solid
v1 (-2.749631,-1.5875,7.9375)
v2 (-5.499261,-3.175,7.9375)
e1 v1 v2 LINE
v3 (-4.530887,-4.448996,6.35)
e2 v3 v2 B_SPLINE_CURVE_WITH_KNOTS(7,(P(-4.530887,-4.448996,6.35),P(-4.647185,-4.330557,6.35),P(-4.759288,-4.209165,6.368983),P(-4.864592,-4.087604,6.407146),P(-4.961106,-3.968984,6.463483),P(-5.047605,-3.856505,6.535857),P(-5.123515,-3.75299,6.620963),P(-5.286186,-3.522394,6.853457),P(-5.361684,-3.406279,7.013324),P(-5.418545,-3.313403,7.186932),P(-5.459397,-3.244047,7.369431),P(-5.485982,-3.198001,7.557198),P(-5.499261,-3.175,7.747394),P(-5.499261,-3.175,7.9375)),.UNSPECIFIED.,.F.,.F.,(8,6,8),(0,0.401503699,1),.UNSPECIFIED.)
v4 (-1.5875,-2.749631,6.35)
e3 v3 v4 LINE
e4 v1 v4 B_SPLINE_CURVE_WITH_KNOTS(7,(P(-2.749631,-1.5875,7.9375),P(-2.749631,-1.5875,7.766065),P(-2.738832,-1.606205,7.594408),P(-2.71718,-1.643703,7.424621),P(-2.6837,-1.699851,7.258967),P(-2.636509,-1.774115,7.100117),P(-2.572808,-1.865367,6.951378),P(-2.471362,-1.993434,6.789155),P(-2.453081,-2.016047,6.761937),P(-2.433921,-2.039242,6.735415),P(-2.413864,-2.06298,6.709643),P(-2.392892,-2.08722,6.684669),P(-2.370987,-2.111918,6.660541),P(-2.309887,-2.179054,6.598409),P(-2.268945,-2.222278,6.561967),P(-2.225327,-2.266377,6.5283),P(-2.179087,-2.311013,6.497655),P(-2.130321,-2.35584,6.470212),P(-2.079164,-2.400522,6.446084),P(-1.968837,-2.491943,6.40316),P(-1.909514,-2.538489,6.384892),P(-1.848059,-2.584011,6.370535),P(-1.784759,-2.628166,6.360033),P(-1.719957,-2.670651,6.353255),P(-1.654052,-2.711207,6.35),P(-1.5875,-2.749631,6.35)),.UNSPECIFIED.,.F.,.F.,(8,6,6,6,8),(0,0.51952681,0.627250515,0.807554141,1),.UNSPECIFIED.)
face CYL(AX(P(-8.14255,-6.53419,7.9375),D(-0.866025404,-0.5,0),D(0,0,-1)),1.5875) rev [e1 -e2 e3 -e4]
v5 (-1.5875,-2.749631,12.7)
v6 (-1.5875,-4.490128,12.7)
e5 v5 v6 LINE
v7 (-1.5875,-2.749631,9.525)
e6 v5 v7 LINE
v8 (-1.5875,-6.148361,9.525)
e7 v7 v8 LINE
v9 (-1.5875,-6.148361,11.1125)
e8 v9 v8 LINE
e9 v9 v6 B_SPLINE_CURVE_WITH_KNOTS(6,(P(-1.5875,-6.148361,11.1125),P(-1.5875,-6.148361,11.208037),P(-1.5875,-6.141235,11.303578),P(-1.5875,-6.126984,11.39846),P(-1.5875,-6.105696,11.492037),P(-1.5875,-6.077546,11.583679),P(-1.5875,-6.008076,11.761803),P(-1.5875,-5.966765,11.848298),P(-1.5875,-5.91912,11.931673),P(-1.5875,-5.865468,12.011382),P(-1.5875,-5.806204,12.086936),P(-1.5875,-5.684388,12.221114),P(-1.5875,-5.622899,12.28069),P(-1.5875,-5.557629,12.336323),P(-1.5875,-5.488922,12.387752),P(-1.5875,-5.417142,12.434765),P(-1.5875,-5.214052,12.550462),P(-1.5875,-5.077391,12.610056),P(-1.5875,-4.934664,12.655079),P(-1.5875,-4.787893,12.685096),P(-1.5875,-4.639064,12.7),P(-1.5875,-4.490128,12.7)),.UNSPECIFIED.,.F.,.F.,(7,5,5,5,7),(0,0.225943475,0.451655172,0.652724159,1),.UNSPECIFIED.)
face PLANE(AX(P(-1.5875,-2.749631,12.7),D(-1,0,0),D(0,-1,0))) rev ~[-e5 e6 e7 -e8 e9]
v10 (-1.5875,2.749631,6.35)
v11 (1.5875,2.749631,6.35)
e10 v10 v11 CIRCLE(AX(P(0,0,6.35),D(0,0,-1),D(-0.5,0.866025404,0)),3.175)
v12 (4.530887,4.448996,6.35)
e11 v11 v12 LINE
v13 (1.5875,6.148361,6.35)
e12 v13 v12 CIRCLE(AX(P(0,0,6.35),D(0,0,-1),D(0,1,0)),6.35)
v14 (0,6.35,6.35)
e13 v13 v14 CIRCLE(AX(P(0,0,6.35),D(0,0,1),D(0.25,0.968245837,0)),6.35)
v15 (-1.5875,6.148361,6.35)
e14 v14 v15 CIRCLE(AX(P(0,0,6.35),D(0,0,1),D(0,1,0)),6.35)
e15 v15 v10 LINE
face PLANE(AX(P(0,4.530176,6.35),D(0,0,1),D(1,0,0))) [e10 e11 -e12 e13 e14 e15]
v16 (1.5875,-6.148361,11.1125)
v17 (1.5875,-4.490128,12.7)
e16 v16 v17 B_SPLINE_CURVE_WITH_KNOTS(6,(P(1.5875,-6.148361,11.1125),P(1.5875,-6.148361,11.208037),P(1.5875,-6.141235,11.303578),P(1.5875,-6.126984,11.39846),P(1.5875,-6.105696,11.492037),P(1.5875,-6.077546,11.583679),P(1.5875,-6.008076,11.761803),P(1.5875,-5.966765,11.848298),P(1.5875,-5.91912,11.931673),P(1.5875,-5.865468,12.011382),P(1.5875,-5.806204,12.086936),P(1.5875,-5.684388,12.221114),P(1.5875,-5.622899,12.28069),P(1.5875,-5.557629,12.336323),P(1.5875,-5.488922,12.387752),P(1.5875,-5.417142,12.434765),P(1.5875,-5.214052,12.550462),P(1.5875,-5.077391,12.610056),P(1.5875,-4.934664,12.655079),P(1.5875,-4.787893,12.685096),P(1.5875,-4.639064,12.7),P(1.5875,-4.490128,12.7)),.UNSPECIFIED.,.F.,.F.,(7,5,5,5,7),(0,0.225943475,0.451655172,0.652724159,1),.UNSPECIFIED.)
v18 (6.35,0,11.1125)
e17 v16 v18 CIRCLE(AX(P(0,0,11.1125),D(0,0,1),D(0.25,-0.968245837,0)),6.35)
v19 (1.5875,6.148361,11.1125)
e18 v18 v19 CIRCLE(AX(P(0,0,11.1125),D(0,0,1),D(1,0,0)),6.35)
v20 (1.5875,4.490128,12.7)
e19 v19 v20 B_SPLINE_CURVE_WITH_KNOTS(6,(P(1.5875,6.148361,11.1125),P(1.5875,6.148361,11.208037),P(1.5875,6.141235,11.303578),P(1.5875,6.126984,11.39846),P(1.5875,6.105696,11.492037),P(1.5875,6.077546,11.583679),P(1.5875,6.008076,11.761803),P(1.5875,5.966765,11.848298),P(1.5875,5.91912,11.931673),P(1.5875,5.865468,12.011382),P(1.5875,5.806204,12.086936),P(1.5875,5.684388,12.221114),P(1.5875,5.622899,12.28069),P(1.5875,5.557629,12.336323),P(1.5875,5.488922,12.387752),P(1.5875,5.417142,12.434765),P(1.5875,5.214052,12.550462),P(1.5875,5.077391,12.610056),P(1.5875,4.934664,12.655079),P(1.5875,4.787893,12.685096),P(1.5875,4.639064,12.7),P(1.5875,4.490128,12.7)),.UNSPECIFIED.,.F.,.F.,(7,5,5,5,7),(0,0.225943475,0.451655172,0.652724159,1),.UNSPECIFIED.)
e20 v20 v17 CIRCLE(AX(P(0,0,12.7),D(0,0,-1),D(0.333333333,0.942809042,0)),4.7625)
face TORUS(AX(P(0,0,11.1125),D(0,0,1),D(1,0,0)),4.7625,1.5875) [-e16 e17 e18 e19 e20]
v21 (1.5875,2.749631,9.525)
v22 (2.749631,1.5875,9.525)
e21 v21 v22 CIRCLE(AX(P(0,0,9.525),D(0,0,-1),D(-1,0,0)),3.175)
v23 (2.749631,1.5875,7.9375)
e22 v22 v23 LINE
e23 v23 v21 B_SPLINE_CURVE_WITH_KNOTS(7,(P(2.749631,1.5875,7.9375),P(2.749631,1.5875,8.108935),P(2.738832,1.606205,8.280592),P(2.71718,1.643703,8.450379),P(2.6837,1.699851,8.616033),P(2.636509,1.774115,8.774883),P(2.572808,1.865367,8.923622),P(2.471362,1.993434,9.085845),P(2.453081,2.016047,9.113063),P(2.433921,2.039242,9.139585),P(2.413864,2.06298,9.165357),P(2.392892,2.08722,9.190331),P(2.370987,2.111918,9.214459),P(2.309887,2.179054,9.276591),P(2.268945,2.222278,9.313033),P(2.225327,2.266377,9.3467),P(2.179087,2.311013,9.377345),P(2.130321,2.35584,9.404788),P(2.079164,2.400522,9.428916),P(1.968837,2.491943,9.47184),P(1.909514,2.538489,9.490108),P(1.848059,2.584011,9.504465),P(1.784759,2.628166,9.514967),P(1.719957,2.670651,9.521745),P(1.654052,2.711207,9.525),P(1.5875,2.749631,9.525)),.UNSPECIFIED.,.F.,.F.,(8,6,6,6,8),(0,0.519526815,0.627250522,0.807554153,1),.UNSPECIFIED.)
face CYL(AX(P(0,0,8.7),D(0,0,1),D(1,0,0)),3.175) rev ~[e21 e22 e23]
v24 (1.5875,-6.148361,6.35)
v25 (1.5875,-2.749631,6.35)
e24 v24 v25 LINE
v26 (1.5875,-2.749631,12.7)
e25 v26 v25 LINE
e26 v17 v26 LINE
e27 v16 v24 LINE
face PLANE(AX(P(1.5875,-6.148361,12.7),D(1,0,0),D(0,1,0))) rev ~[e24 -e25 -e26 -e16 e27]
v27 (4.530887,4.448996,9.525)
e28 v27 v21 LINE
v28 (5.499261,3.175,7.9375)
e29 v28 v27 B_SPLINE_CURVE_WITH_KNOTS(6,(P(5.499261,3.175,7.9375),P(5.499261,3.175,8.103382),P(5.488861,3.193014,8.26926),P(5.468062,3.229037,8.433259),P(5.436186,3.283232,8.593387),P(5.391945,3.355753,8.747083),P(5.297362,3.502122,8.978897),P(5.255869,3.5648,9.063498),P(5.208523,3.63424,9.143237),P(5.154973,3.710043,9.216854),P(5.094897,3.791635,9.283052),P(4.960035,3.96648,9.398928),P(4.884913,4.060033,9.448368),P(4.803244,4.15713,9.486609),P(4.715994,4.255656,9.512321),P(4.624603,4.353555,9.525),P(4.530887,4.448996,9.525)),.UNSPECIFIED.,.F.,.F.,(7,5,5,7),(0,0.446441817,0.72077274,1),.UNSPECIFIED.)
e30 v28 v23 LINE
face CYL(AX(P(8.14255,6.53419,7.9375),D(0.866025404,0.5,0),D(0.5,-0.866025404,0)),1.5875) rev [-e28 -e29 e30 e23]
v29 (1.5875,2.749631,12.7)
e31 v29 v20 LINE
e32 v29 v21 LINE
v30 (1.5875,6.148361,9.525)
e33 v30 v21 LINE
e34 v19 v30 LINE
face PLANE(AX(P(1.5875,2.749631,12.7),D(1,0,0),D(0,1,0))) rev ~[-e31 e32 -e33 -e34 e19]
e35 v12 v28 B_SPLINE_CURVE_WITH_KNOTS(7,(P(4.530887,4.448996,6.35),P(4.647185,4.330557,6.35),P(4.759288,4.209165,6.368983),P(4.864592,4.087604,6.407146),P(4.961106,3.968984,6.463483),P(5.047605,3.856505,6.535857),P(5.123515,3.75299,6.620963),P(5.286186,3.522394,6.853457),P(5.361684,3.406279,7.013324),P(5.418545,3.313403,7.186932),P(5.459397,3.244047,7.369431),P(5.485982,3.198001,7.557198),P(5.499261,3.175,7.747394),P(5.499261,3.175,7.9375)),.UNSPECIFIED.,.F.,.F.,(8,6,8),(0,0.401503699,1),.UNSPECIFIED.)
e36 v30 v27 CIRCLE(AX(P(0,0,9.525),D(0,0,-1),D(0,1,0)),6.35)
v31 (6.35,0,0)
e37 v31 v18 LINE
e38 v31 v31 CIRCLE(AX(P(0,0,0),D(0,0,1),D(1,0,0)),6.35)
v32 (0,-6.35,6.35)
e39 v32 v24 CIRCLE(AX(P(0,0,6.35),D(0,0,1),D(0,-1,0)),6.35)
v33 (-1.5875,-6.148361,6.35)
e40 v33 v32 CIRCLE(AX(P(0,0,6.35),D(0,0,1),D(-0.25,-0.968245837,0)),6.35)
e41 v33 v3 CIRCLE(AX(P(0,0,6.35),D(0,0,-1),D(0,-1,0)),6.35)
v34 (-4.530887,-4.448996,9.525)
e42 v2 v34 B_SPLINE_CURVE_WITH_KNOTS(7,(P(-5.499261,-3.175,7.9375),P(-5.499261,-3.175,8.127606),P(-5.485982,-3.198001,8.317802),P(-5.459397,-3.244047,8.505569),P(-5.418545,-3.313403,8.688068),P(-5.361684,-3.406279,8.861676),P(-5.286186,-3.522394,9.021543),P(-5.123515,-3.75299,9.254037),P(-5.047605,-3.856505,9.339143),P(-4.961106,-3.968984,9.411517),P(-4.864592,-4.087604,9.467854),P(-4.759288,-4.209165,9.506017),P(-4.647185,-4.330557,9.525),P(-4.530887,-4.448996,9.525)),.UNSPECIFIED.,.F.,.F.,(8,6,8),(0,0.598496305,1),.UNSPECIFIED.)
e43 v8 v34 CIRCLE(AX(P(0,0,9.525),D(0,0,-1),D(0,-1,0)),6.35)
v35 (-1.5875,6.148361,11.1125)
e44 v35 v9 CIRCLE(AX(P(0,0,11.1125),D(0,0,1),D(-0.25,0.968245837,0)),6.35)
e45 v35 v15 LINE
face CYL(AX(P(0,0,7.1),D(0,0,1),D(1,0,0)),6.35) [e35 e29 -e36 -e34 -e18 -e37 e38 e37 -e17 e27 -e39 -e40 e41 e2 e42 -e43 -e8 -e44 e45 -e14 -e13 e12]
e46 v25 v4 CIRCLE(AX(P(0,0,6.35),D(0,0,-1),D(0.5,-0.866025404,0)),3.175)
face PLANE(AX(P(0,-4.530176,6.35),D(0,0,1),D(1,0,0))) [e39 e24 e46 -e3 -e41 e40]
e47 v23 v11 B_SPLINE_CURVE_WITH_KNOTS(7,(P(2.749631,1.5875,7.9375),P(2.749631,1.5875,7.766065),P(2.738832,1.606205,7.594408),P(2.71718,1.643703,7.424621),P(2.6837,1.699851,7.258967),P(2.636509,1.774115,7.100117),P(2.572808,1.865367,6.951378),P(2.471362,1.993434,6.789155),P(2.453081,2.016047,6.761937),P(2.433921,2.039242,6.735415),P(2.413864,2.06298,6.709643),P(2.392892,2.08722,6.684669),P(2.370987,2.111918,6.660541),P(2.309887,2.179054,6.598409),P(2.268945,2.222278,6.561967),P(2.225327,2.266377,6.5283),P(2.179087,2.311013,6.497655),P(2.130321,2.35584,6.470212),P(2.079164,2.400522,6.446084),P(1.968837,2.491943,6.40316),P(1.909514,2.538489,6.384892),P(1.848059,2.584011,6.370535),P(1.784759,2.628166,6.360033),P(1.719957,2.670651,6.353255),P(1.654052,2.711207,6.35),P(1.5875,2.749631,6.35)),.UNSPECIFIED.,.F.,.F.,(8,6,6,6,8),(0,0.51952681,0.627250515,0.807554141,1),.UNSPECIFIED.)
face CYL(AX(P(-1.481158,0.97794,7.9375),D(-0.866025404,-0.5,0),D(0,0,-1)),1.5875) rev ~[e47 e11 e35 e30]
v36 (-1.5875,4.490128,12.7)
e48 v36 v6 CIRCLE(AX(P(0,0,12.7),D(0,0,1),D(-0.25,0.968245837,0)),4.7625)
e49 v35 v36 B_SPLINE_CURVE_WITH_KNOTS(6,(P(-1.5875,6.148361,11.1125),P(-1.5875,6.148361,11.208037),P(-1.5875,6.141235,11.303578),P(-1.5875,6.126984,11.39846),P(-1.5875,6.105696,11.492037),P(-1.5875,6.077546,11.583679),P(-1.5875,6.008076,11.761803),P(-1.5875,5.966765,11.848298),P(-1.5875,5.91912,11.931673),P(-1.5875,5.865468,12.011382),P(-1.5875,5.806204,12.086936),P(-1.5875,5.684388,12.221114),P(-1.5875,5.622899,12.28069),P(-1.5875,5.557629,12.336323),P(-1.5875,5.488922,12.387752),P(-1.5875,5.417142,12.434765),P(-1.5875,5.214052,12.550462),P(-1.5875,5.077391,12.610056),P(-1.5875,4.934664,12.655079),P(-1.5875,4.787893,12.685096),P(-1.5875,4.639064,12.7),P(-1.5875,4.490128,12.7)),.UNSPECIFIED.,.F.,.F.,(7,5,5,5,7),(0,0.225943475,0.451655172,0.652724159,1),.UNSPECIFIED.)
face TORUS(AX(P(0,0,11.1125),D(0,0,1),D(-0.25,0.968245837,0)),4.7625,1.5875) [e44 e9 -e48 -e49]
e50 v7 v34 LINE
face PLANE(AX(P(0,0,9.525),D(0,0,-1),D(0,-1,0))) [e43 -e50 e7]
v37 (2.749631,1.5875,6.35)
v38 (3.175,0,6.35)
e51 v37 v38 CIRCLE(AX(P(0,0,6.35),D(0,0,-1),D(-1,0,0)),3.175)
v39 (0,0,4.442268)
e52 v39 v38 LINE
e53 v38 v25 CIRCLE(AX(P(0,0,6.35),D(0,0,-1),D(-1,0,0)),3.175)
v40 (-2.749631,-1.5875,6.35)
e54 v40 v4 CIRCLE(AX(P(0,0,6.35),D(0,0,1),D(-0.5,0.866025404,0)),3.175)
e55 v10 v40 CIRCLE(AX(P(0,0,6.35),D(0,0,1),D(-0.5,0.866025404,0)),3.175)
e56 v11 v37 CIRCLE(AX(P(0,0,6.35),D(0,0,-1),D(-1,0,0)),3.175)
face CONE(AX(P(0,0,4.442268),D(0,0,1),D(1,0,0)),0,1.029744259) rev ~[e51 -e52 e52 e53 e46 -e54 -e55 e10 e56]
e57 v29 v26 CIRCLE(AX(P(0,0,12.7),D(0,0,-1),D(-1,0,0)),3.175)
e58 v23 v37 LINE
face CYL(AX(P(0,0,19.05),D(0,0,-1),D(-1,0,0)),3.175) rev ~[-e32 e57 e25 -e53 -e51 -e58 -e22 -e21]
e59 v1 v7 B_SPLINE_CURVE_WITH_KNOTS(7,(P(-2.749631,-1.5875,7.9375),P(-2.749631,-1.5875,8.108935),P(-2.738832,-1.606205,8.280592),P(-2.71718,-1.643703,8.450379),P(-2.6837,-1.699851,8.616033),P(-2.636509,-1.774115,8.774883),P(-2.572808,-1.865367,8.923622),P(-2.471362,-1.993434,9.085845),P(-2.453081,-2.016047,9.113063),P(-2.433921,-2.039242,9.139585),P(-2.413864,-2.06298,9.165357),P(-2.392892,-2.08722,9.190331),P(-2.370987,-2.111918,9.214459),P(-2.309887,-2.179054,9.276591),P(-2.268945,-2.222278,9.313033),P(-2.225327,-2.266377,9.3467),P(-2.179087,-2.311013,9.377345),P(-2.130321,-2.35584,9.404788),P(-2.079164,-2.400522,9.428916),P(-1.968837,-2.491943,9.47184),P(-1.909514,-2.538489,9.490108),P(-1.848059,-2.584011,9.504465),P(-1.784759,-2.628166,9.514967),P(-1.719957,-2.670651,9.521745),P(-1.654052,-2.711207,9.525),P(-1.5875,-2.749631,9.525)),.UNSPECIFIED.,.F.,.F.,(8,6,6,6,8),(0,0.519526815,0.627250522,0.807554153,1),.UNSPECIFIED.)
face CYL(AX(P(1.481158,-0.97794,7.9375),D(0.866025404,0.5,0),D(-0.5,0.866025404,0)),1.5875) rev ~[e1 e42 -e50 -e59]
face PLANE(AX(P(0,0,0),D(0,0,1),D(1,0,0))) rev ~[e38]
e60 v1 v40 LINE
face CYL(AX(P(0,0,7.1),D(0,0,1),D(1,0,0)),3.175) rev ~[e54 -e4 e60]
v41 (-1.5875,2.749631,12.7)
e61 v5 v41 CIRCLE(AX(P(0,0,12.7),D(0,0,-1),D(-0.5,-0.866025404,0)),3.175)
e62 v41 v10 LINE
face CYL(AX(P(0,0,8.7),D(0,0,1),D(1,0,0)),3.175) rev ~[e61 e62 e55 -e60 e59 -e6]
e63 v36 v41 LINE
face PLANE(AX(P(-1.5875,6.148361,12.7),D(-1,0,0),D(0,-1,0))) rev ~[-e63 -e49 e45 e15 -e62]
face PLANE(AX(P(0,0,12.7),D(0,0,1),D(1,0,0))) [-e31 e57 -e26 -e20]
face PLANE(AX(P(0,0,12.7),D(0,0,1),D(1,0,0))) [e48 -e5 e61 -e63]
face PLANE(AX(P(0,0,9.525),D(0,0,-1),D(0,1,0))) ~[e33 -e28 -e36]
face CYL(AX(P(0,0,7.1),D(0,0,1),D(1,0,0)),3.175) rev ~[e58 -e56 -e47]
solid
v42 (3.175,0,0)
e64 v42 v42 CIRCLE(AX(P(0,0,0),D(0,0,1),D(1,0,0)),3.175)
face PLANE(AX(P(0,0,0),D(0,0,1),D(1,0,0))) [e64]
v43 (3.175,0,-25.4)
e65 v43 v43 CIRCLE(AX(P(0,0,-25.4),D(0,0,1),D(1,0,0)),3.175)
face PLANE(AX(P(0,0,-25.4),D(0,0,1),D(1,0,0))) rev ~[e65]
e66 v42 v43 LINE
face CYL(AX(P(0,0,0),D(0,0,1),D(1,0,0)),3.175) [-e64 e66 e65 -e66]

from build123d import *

# Parameters (mm, degrees)
F0_R          = 6.35
F1_DEPTH      = 12.7
F2_R          = 3.175
F3_DEPTH      = 25.4
F5_D          = 6.35
F5_DEPTH      = 6.35
F5_TIP        = 1.9077324654
F7_DEPTH      = 6.35
F10_W         = 4.7625
F10_H         = 3.175
F10_W_2       = 4.7752
F11_ANGLE     = 60
F12_T4_DEPTH  = 11.1125
F12_S5_R      = 6.35
F12_T6_DEPTH  = 8
F12_S7_R      = 3.175
F12_T8_DEPTH  = 8
F12_T12_DEPTH = 11.1125
F12_S13_R     = 6.35
F12_T14_DEPTH = 8
F12_S15_R     = 3.175
F12_T16_DEPTH = 8
F12_T20_DEPTH = 11.1125
F12_S21_R     = 6.35
F12_T22_DEPTH = 8
F12_S23_R     = 3.175
F12_T24_DEPTH = 8
F12_T28_DEPTH = 11.1125
F12_S29_R     = 6.35
F12_T30_DEPTH = 8
F12_S31_R     = 3.175
F12_T32_DEPTH = 8
F13_R         = 1.5875


# Not quite as in the source:
# - a fillet or chamfer that OpenCascade refuses, or shapes differently, is made with other operations: its cross-section is extruded or revolved along the edge and cut away or added
# - a feature names something its author has since deleted; it is built from what else it names


with BuildPart() as f1:
    # F0 (on Top) → F1 (new body)
    with BuildSketch(Plane.XY):
        Circle(F0_R)
    extrude(amount=F1_DEPTH)

    # F5
    with Locations(Plane.XY.offset(12.7)):
        with Locations((0, 0)):
            Hole(F5_D / 2, depth=F5_DEPTH)
            with Locations((0, 0, -(F5_DEPTH + F5_TIP / 2))):  # 118° drill point
                Cone(0, F5_D / 2, F5_TIP, mode=Mode.SUBTRACT)

    # F6 (on face) → F7 (cut)
    with BuildSketch(Plane.XY.offset(12.7)):
        with BuildLine():
            Line((-1.5875, -2.749630657), (-1.5875, -6.1483610621))
            ThreePointArc((-1.5875, -6.1483610621), (-0.8001272573, -6.2993885713), (0, -6.35))
            ThreePointArc((0, -6.35), (0.8001272573, -6.2993885713), (1.5875, -6.1483610621))
            Line((1.5875, -6.1483610621), (1.5875, -2.749630657))
            ThreePointArc((1.5875, -2.749630657), (0, -3.175), (-1.5875, -2.749630657))
        make_face()
        with BuildLine():
            ThreePointArc((1.5875, 6.1483610621), (0.8001272573, 6.2993885713), (0, 6.35))
            ThreePointArc((0, 6.35), (-0.8001272573, 6.2993885713), (-1.5875, 6.1483610621))
            Line((-1.5875, 6.1483610621), (-1.5875, 2.749630657))
            ThreePointArc((-1.5875, 2.749630657), (0, 3.175), (1.5875, 2.749630657))
            Line((1.5875, 2.749630657), (1.5875, 6.1483610621))
        make_face()
    extrude(amount=-F7_DEPTH, mode=Mode.SUBTRACT)

    # F10 (on face) → F11 (revolve, cut)
    with BuildSketch(Plane.YZ):
        with Locations((-3.96875, 7.9375)):
            Rectangle(F10_W, F10_H)
        with Locations((3.9624, 7.9375)):
            Rectangle(F10_W_2, F10_H)
    revolve(axis=Axis((0, 0, 6.35), (0, 0, -1)), revolution_arc=F11_ANGLE, mode=Mode.SUBTRACT)

    # F12: fillet of radius 1.5875 on 4 edges, made by hand


with BuildPart() as f3:
    # F2 (on Top) → F3 (new body)
    with BuildSketch(Plane.XY):
        Circle(F2_R)
    extrude(amount=-F3_DEPTH)


with BuildPart() as f12_tool2:
    # F12_s3 → F12_t4 (new body)
    with BuildSketch(Plane(origin=(0.6874076643, 0.396875, 0), x_dir=(0, 0, 1), z_dir=(-0.8660254038, -0.5, 0))):
        with BuildLine():
            ThreePointArc((7.9375, 0), (9.0600320151, -0.4649679849), (9.525, -1.5875))
            Line((9.525, -1.5875), (9.525, 0))
            Line((9.525, 0), (7.9375, 0))
        make_face()
    extrude(amount=F12_T4_DEPTH)

    # F12_s5 → F12_t6 (intersect, symmetric)
    with BuildSketch(Plane.XY.offset(8.7)):
        Circle(F12_S5_R)
    extrude(amount=F12_T6_DEPTH, both=True, mode=Mode.INTERSECT)

    # F12_s7 → F12_t8 (cut, symmetric)
    with BuildSketch(Plane.XY.offset(8.7)):
        Circle(F12_S7_R)
    extrude(amount=F12_T8_DEPTH, both=True, mode=Mode.SUBTRACT)


with BuildPart() as f1_1:
    add(f1.part)

    # F12_t1: union F12_tool2
    add(f12_tool2.part)


with BuildPart() as f12_tool10:
    # F12_s11 → F12_t12 (new body)
    with BuildSketch(Plane(origin=(-8.9362996353, -5.159375, 0), x_dir=(0, 0, 1), z_dir=(0.8660254038, 0.5, 0))):
        with BuildLine():
            ThreePointArc((6.35, 1.5875), (6.8149679849, 0.4649679849), (7.9375, 0))
            Line((7.9375, 0), (6.35, 0))
            Line((6.35, 0), (6.35, 1.5875))
        make_face()
    extrude(amount=F12_T12_DEPTH)

    # F12_s13 → F12_t14 (intersect, symmetric)
    with BuildSketch(Plane.XY.offset(7.1)):
        Circle(F12_S13_R)
    extrude(amount=F12_T14_DEPTH, both=True, mode=Mode.INTERSECT)

    # F12_s15 → F12_t16 (cut, symmetric)
    with BuildSketch(Plane.XY.offset(7.1)):
        Circle(F12_S15_R)
    extrude(amount=F12_T16_DEPTH, both=True, mode=Mode.SUBTRACT)


with BuildPart() as f1_2:
    add(f1_1.part)

    # F12_t9: union F12_tool10
    add(f12_tool10.part)


with BuildPart() as f12_tool18:
    # F12_s19 → F12_t20 (new body)
    with BuildSketch(Plane(origin=(8.9362996353, 5.159375, 0), x_dir=(0, 0, 1), z_dir=(-0.8660254038, -0.5, 0))):
        with BuildLine():
            ThreePointArc((7.9375, 0), (9.0600320151, 0.4649679849), (9.525, 1.5875))
            Line((9.525, 1.5875), (9.525, 0))
            Line((9.525, 0), (7.9375, 0))
        make_face()
    extrude(amount=F12_T20_DEPTH)

    # F12_s21 → F12_t22 (intersect, symmetric)
    with BuildSketch(Plane.XY.offset(8.7)):
        Circle(F12_S21_R)
    extrude(amount=F12_T22_DEPTH, both=True, mode=Mode.INTERSECT)

    # F12_s23 → F12_t24 (cut, symmetric)
    with BuildSketch(Plane.XY.offset(8.7)):
        Circle(F12_S23_R)
    extrude(amount=F12_T24_DEPTH, both=True, mode=Mode.SUBTRACT)


with BuildPart() as f1_3:
    add(f1_2.part)

    # F12_t17: union F12_tool18
    add(f12_tool18.part)


with BuildPart() as f12_tool26:
    # F12_s27 → F12_t28 (new body)
    with BuildSketch(Plane(origin=(-0.6874076643, -0.396875, 0), x_dir=(0, 0, 1), z_dir=(0.8660254038, 0.5, 0))):
        with BuildLine():
            ThreePointArc((6.35, -1.5875), (6.8149679849, -0.4649679849), (7.9375, 0))
            Line((7.9375, 0), (6.35, 0))
            Line((6.35, 0), (6.35, -1.5875))
        make_face()
    extrude(amount=F12_T28_DEPTH)

    # F12_s29 → F12_t30 (intersect, symmetric)
    with BuildSketch(Plane.XY.offset(7.1)):
        Circle(F12_S29_R)
    extrude(amount=F12_T30_DEPTH, both=True, mode=Mode.INTERSECT)

    # F12_s31 → F12_t32 (cut, symmetric)
    with BuildSketch(Plane.XY.offset(7.1)):
        Circle(F12_S31_R)
    extrude(amount=F12_T32_DEPTH, both=True, mode=Mode.SUBTRACT)


with BuildPart() as f1_4:
    add(f1_3.part)

    # F12_t25: union F12_tool26
    add(f12_tool26.part)

    # F13
    f13_edges = [f1_4.edges().sort_by_distance(p)[0] for p in [
        (-6.35, 0, 12.7),
        (5.020116, 3.888565, 12.7),
        (5.020116, -3.888565, 12.7),
    ]]
    fillet(f13_edges, radius=F13_R)


solid = Compound([f3.part, f1_4.part])
